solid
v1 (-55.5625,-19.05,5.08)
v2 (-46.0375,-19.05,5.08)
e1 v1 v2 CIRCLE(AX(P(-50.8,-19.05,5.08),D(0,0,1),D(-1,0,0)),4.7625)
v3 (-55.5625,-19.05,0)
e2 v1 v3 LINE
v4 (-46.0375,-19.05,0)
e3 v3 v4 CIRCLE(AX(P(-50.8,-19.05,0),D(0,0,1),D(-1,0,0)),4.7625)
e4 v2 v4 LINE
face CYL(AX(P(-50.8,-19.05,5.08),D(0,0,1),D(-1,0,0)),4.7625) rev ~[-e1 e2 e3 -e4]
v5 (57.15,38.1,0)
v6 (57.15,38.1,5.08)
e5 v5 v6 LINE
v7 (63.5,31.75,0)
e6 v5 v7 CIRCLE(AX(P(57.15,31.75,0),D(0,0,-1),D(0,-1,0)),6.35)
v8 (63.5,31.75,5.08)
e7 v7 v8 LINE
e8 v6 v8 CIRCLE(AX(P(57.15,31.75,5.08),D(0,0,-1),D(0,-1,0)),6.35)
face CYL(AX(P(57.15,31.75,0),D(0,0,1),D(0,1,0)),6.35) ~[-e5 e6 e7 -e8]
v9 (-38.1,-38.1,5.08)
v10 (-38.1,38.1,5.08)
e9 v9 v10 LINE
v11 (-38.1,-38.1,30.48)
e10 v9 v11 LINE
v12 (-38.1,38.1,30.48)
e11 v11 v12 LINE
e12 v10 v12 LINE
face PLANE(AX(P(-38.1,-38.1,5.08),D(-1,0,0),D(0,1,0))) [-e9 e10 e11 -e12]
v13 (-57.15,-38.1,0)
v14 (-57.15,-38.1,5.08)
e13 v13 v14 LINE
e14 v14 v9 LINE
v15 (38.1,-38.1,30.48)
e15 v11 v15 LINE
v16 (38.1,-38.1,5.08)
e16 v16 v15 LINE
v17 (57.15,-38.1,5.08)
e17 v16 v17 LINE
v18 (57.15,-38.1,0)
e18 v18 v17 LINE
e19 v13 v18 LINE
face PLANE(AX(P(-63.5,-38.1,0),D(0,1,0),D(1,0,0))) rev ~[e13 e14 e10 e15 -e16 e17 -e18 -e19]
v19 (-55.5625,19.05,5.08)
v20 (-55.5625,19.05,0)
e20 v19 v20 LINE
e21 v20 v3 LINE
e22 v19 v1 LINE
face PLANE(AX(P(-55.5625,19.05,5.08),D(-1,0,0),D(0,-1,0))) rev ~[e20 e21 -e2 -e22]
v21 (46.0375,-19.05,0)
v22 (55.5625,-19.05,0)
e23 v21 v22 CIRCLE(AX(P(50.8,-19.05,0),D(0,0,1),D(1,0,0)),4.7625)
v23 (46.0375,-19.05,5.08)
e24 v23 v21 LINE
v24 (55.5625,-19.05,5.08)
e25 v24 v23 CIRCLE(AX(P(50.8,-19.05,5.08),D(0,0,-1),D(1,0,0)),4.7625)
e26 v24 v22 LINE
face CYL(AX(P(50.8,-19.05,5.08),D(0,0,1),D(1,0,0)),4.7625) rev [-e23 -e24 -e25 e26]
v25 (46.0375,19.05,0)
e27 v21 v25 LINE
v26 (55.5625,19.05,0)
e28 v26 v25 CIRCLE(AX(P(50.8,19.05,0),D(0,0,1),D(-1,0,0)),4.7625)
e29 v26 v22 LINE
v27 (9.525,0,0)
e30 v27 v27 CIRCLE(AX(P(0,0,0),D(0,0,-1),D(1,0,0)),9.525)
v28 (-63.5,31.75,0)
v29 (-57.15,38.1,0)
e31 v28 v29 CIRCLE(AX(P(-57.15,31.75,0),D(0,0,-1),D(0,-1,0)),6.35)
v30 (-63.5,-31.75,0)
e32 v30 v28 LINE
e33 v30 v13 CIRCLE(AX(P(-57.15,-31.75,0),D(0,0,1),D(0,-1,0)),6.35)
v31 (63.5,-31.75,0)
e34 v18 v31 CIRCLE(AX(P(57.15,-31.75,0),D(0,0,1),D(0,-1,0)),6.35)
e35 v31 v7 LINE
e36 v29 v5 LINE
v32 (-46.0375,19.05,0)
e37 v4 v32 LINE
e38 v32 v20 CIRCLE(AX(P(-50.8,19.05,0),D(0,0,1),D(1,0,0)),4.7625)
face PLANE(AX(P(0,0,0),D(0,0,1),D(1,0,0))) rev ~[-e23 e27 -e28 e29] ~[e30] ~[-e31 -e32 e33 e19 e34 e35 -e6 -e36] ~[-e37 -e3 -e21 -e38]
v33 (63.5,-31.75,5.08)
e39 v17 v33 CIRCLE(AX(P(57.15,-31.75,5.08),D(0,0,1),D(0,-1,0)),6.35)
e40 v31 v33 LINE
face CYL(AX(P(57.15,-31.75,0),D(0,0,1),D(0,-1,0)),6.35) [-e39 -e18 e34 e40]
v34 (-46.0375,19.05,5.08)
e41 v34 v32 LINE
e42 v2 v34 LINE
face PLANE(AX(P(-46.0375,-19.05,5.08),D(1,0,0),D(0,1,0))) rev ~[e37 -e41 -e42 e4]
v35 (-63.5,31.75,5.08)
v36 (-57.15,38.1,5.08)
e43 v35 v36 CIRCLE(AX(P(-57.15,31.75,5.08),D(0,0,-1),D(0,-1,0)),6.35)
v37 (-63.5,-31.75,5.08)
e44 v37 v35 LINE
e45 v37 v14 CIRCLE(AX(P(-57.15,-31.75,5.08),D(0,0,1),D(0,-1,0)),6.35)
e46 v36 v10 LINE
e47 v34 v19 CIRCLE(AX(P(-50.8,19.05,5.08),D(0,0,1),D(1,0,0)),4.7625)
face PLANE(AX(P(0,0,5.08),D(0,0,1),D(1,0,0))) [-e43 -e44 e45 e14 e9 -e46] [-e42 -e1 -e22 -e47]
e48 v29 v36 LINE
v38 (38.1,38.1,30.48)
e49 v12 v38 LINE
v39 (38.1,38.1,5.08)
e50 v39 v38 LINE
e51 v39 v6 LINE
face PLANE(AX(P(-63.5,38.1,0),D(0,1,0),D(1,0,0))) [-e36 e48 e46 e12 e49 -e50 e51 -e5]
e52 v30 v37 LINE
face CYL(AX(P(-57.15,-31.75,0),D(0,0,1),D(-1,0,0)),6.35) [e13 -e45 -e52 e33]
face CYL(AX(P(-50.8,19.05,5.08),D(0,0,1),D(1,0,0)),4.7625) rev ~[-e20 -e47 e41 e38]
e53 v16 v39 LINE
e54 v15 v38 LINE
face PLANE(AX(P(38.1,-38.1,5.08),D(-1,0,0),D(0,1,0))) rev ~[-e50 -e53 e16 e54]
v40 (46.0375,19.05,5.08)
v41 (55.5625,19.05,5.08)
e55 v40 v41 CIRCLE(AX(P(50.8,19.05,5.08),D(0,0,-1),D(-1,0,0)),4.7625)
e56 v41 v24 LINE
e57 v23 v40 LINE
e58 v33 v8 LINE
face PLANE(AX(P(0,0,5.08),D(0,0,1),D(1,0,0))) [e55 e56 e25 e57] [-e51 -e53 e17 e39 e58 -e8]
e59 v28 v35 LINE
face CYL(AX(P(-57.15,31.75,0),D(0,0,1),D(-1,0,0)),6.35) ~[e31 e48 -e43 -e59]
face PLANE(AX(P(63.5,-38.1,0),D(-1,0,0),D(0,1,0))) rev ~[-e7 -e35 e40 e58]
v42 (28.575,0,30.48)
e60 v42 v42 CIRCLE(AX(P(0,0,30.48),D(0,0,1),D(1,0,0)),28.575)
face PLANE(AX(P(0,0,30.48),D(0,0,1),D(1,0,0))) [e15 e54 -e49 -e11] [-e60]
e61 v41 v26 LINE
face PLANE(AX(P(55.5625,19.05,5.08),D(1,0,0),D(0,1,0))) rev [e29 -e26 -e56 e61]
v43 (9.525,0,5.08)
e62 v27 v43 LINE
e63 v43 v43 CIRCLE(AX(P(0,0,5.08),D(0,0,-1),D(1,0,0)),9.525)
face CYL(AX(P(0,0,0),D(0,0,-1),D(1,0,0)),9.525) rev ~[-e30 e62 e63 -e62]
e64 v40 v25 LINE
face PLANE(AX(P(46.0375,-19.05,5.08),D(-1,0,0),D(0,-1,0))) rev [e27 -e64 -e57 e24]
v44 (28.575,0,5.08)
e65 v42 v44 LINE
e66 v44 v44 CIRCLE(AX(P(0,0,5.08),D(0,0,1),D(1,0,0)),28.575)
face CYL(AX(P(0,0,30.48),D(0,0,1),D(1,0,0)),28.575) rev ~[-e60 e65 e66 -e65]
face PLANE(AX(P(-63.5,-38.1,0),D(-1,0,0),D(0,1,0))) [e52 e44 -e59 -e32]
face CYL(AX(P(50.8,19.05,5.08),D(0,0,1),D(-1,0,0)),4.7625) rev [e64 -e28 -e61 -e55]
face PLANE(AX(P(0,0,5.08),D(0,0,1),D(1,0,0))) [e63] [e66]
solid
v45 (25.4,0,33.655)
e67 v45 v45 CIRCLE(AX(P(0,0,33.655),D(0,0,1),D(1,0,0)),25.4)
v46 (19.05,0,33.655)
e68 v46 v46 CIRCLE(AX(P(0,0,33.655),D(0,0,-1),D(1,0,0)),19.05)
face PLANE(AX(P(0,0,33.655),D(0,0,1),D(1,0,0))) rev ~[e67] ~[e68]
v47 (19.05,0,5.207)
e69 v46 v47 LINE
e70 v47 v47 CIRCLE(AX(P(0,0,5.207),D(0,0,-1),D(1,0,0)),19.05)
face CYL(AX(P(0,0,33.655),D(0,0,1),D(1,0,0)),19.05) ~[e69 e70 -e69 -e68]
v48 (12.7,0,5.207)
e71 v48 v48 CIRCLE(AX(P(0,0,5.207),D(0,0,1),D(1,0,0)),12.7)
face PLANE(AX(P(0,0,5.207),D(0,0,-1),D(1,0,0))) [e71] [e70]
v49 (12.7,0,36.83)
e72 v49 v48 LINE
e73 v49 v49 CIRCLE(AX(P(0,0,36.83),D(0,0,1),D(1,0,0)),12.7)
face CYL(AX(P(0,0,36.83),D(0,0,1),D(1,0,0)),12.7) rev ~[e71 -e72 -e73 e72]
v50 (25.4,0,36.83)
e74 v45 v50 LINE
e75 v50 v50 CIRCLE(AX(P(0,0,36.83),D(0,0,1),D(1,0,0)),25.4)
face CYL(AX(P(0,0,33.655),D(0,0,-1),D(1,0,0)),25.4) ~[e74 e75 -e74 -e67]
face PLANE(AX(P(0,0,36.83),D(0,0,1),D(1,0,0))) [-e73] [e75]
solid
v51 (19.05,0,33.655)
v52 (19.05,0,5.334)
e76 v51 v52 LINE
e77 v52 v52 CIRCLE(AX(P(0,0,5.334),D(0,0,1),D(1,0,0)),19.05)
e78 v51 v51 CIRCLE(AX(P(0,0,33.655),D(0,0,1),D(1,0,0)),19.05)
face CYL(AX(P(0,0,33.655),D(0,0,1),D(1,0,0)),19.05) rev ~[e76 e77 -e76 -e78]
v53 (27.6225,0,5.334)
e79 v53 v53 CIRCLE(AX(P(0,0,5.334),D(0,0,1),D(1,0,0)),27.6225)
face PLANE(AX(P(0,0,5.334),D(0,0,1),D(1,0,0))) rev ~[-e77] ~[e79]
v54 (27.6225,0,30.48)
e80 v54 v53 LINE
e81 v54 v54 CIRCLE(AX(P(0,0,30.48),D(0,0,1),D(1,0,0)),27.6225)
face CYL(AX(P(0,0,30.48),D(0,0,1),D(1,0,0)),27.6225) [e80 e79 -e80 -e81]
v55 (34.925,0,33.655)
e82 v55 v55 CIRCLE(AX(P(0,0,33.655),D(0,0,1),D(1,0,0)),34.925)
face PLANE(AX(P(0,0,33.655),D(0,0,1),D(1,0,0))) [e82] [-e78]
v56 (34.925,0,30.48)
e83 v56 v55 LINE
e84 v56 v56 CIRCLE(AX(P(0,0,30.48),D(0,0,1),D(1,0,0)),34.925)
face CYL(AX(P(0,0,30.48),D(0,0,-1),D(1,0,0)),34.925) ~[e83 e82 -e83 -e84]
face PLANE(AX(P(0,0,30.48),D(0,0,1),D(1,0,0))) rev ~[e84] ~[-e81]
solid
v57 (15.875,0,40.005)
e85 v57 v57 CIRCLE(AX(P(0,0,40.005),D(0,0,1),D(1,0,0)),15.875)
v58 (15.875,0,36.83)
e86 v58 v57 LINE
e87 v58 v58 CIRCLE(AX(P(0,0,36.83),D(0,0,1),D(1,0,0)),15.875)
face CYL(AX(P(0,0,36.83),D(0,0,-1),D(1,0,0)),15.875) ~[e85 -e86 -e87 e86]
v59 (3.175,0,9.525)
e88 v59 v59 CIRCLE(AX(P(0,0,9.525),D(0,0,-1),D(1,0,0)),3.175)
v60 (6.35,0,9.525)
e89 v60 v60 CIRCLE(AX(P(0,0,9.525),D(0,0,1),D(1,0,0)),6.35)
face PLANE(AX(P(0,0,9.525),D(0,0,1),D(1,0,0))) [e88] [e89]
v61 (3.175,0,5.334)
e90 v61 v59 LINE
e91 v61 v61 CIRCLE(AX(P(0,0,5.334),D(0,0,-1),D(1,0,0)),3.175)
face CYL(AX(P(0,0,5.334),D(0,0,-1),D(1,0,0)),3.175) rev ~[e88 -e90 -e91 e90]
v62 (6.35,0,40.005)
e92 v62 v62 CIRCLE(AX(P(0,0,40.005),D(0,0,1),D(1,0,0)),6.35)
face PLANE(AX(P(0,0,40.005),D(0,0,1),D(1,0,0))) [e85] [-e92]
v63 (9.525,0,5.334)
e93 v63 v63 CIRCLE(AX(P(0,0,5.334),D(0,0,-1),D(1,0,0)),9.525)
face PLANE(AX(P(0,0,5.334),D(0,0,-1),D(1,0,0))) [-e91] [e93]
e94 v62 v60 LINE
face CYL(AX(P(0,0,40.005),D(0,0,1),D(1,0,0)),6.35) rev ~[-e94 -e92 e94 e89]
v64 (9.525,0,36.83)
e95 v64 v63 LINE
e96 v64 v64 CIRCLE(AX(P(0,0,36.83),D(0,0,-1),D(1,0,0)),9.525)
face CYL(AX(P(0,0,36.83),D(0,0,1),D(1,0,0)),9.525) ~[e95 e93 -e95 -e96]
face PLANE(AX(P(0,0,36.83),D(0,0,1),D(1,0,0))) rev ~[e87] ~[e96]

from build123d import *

# Parameters (mm, degrees)
F0_W      = 127
F0_H      = 76.2
F1_DEPTH  = 5.08
F2_W      = 76.2
F2_H      = 76.2
F3_DEPTH  = 25.4
F4_R      = 28.575
F5_DEPTH  = 25.4
F6_R      = 6.35
F8_DEPTH  = 25.4
F9_R      = 34.925
F10_DEPTH = 3.175
F11_R     = 27.6225
F12_DEPTH = 25.146
F13_R     = 19.05
F14_DEPTH = 31.496
F15_R     = 9.525
F16_DEPTH = 5.08
F17_R     = 25.4
F18_DEPTH = 3.175
F19_R     = 19.05
F20_DEPTH = 28.448
F21_R     = 12.7
F22_DEPTH = 31.623
F23_R     = 15.875
F24_DEPTH = 3.175
F25_R     = 9.525
F26_DEPTH = 31.496
F27_R     = 6.35
F28_DEPTH = 30.48
F29_R     = 3.175
F30_DEPTH = 25.4


# Not quite as in the source:
# - a pattern or mirror of a feature is missing from the dataset's text; its kind, count and spacing are read off the source's solid


with BuildPart() as f1:
    # F0 (on Top) → F1 (new body)
    with BuildSketch(Plane.XY):
        Rectangle(F0_W, F0_H)
    extrude(amount=F1_DEPTH)

    # F2 (on face) → F3 (join)
    with BuildSketch(Plane.XY.offset(5.08)):
        Rectangle(F2_W, F2_H)
    extrude(amount=F3_DEPTH)

    # F4 (on face) → F5 (cut)
    with BuildSketch(Plane.XY.offset(30.48)):
        Circle(F4_R)
    extrude(amount=-F5_DEPTH, mode=Mode.SUBTRACT)

    # F6
    f6_edges = [f1.edges().sort_by_distance(p)[0] for p in [
        (63.5, -38.1, 2.54),
        (63.5, 38.1, 2.54),
        (-63.5, 38.1, 2.54),
        (-63.5, -38.1, 2.54),
    ]]
    fillet(f6_edges, radius=F6_R)

    # F7 (on face) → F8 (cut)
    with BuildSketch(Plane.XY.offset(5.08)):
        with BuildLine():
            Line((-46.0375, -19.05), (-46.0375, 19.05))
            ThreePointArc((-46.0375, 19.05), (-50.8, 23.8125), (-55.5625, 19.05))
            Line((-55.5625, 19.05), (-55.5625, -19.05))
            ThreePointArc((-55.5625, -19.05), (-50.8, -23.8125), (-46.0375, -19.05))
        make_face()
    f8 = extrude(amount=-F8_DEPTH, mode=Mode.SUBTRACT)

    # F8_copies: F8 across plane
    add(f8.mirror(Plane(origin=(0, 0, 0), x_dir=(0, 0, 1), z_dir=(1, 0, 0))), mode=Mode.SUBTRACT)

    # F15 (on face) → F16 (cut, through all)
    with BuildSketch(Plane(origin=(0, 0, 0), x_dir=(1, 0, 0), z_dir=(0, 0, -1))):
        Circle(F15_R)
    extrude(amount=-F16_DEPTH, mode=Mode.SUBTRACT)


with BuildPart() as f10:
    # F9 (on face) → F10 (new body)
    with BuildSketch(Plane.XY.offset(30.48)):
        Circle(F9_R)
    extrude(amount=F10_DEPTH)

    # F11 (on face) → F12 (join)
    with BuildSketch(Plane.XY.offset(30.48)):
        Circle(F11_R)
    extrude(amount=-F12_DEPTH)

    # F13 (on face) → F14 (cut)
    with BuildSketch(Plane.XY.offset(33.655)):
        Circle(F13_R)
    extrude(amount=-F14_DEPTH, mode=Mode.SUBTRACT)


with BuildPart() as f18:
    # F17 (on face) → F18 (new body)
    with BuildSketch(Plane.XY.offset(33.655)):
        Circle(F17_R)
    extrude(amount=F18_DEPTH)

    # F19 (on face) → F20 (join)
    with BuildSketch(Plane(origin=(0, 0, 33.655), x_dir=(1, 0, 0), z_dir=(0, 0, -1))):
        Circle(F19_R)
    extrude(amount=F20_DEPTH)

    # F21 (on face) → F22 (cut, through all)
    with BuildSketch(Plane.XY.offset(36.83)):
        Circle(F21_R)
    extrude(amount=-F22_DEPTH, mode=Mode.SUBTRACT)


with BuildPart() as f24:
    # F23 (on face) → F24 (new body)
    with BuildSketch(Plane.XY.offset(36.83)):
        Circle(F23_R)
    extrude(amount=F24_DEPTH)

    # F25 (on face) → F26 (join)
    with BuildSketch(Plane(origin=(0, 0, 36.83), x_dir=(1, 0, 0), z_dir=(0, 0, -1))):
        Circle(F25_R)
    extrude(amount=F26_DEPTH)

    # F27 (on face) → F28 (cut)
    with BuildSketch(Plane.XY.offset(40.005)):
        Circle(F27_R)
    extrude(amount=-F28_DEPTH, mode=Mode.SUBTRACT)

    # F29 (on face) → F30 (cut)
    with BuildSketch(Plane(origin=(0, 0, 5.334), x_dir=(1, 0, 0), z_dir=(0, 0, -1))):
        Circle(F29_R)
    extrude(amount=-F30_DEPTH, mode=Mode.SUBTRACT)


solid = Compound([f1.part, f10.part, f18.part, f24.part])
